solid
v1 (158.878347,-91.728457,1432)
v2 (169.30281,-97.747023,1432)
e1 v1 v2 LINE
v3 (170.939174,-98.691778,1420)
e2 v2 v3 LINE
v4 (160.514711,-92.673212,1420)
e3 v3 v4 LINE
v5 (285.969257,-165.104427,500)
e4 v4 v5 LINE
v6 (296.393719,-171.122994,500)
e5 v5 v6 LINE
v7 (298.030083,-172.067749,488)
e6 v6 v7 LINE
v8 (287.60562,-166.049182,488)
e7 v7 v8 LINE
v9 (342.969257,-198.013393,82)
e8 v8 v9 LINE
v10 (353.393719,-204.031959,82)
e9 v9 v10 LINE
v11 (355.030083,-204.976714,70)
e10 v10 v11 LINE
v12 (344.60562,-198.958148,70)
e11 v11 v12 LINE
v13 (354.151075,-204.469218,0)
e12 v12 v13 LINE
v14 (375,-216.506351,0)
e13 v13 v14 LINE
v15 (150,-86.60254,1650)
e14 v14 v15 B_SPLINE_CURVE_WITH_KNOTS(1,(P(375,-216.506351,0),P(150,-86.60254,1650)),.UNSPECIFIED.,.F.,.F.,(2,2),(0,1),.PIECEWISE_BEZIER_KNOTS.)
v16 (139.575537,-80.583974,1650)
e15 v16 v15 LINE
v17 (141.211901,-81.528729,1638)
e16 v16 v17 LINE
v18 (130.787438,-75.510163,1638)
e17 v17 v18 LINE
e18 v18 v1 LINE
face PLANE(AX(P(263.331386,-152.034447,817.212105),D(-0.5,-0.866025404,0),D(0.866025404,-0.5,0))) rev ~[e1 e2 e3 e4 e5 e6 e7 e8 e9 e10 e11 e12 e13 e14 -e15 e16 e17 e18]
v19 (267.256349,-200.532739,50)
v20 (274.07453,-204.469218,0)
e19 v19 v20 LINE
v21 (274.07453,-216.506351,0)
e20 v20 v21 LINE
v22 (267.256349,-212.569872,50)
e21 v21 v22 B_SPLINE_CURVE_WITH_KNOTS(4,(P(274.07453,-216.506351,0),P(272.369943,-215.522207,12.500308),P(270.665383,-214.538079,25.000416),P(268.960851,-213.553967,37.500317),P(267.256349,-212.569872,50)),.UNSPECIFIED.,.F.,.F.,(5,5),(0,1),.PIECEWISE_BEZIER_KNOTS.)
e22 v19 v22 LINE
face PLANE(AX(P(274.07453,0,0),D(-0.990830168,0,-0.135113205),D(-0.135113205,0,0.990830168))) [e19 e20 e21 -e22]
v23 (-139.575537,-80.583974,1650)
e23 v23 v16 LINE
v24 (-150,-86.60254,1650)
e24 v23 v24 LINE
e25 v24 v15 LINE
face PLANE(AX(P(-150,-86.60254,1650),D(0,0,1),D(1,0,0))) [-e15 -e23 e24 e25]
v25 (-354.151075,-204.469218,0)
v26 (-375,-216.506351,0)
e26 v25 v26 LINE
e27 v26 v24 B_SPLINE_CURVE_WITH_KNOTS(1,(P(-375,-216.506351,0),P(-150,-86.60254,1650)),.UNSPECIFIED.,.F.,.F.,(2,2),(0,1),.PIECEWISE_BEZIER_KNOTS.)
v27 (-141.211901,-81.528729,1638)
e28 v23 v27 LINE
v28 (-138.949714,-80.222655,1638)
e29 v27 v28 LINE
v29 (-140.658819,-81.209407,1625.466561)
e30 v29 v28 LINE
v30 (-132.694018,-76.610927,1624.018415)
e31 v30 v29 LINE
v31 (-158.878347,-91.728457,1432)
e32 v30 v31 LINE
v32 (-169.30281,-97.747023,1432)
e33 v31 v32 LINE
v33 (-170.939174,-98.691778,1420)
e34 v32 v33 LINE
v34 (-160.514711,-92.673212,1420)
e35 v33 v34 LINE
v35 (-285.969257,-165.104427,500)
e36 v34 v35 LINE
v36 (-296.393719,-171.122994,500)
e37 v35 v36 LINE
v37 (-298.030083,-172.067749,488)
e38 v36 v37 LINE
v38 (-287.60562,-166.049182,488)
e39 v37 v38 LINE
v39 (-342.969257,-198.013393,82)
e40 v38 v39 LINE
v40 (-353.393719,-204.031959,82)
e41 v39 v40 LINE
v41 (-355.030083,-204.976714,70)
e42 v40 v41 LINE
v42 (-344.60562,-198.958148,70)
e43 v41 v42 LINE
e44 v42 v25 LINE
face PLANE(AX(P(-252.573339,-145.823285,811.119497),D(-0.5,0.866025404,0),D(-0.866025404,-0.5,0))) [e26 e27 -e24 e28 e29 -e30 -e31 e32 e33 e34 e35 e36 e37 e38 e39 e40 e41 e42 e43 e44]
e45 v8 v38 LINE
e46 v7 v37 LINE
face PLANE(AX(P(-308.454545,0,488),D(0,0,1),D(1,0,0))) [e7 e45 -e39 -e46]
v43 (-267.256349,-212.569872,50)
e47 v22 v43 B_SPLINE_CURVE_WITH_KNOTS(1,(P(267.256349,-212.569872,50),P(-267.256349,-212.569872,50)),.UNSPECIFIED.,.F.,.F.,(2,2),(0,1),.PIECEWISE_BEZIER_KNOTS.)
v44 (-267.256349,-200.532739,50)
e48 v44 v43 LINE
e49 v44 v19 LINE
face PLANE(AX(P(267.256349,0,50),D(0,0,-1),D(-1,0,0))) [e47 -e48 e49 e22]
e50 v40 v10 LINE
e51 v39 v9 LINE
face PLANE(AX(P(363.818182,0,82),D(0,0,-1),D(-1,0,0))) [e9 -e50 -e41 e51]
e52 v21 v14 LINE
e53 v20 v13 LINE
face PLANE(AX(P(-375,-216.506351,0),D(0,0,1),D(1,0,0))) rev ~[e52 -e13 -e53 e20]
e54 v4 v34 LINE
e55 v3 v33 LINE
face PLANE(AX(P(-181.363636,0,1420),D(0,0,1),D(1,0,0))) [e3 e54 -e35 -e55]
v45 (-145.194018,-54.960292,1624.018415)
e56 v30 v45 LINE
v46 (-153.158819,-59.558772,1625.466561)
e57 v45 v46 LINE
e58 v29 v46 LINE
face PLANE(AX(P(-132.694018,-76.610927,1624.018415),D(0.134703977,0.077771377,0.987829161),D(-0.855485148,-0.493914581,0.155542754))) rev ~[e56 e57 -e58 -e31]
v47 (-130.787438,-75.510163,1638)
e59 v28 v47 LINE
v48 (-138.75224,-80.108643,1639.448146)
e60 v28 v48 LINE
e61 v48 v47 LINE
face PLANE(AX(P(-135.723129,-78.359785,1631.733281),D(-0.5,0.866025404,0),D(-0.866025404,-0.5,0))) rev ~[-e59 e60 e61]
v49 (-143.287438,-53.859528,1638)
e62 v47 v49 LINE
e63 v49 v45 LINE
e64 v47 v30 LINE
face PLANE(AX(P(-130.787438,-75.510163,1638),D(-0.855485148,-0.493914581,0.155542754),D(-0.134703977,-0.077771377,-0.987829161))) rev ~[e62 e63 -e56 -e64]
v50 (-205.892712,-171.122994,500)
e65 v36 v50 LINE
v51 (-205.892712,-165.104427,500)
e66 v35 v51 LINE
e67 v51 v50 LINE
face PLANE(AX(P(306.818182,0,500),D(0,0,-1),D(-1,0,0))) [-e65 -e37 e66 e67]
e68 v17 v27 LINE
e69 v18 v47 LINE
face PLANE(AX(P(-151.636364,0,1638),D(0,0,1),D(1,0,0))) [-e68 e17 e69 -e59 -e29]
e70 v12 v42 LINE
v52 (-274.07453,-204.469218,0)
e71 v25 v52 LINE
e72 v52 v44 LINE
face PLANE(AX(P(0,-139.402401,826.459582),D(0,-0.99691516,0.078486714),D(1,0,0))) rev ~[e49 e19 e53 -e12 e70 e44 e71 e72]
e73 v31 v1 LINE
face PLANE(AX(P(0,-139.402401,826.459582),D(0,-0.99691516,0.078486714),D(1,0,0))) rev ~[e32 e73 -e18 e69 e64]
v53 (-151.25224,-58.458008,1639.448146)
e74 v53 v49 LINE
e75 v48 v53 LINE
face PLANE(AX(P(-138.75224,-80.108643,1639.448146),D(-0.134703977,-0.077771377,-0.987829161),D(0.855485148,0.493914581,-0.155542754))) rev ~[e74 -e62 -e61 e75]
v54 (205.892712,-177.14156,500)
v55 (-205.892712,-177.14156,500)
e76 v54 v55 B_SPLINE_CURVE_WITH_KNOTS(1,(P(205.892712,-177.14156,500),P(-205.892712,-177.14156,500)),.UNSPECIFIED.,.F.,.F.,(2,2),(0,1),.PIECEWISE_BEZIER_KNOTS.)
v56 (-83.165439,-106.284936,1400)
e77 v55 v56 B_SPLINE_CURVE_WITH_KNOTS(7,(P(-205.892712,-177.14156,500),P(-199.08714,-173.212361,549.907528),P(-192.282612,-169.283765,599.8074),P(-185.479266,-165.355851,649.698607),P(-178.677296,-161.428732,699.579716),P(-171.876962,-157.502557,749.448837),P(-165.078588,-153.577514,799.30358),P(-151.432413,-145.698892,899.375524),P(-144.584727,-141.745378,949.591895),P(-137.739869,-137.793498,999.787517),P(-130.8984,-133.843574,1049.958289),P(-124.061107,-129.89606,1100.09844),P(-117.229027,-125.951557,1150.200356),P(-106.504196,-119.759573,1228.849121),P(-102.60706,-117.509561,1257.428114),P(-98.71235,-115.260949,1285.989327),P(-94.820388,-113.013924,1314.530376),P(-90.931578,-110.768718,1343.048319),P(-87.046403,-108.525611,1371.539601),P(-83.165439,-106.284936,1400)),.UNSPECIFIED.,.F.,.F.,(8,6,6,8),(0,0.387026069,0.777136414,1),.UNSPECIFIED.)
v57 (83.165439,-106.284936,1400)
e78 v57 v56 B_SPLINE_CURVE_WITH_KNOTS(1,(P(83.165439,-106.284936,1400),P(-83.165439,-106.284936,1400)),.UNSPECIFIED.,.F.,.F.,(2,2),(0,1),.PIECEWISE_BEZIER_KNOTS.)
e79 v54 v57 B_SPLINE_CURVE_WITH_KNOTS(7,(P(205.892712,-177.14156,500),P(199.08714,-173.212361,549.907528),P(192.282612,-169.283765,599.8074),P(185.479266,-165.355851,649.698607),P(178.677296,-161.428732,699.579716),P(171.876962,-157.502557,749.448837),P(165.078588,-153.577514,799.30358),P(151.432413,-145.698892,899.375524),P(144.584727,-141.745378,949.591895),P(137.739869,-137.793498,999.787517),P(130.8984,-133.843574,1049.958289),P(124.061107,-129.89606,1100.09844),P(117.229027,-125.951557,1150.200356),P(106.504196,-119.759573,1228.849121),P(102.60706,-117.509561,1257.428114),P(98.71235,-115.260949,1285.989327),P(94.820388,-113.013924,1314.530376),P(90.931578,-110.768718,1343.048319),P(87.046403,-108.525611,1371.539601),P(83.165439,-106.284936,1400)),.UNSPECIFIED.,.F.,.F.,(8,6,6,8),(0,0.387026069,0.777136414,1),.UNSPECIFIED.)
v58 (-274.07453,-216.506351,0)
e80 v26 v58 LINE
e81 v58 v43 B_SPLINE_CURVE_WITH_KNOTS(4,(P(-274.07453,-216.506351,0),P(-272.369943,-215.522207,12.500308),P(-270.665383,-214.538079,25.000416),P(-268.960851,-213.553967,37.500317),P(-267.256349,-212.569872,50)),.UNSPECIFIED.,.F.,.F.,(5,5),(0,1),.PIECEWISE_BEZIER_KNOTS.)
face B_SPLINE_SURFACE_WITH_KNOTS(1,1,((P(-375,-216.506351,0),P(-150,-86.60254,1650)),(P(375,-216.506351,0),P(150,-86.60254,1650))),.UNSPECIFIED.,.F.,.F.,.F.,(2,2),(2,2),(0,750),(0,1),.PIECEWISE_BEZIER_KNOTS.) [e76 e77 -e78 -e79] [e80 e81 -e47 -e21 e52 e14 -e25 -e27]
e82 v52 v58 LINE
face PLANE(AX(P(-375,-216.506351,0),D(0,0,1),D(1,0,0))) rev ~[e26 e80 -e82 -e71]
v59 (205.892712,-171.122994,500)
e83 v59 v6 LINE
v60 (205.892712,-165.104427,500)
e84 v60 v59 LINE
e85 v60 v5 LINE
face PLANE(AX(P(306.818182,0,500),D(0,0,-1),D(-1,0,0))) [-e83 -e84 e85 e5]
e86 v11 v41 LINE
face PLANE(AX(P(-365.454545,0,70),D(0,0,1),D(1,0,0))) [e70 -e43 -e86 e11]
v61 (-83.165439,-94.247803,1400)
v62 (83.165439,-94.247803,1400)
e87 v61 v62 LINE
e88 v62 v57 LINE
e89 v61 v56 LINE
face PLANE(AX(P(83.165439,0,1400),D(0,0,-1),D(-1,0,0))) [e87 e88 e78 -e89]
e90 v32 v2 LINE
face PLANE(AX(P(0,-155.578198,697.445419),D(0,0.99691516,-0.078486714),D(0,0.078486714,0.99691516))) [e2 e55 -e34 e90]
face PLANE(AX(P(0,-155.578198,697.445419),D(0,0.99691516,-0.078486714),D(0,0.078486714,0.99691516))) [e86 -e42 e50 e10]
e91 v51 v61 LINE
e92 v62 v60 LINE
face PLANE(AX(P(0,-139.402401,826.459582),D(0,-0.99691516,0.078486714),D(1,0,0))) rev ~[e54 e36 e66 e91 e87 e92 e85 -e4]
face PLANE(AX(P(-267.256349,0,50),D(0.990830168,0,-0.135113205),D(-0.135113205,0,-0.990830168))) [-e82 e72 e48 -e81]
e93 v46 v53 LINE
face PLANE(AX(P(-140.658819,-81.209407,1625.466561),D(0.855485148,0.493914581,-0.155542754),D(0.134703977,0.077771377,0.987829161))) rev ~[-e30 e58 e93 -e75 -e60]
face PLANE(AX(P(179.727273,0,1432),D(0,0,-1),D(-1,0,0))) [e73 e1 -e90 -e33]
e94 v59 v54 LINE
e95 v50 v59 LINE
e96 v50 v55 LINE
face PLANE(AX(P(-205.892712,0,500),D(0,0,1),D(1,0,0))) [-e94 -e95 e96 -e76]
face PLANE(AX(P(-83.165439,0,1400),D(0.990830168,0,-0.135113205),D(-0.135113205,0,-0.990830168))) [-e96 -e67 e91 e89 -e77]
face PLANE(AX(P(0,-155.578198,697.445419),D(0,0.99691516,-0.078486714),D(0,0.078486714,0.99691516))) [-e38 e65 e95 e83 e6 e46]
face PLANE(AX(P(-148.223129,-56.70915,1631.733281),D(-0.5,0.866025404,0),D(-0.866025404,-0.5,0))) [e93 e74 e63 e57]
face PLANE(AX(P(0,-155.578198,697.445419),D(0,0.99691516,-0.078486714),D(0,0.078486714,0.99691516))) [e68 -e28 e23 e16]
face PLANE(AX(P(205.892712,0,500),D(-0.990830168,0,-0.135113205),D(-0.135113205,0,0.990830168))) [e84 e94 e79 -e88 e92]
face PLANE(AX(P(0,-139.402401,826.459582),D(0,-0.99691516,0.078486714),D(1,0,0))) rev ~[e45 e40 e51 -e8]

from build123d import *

# Parameters (mm, degrees)
F7_R      = 960.2431856589
F8_DEPTH  = 635.5163904251
F12_R     = 870.2287794889
F13_DEPTH = 25
F14_R     = 892.9375722879
F15_DEPTH = 25
F19_REACH = 935.9843056137
F20_DEPTH = 216.5073510461
F23_DEPTH = 25


with BuildPart() as f5:
    # F3 (on Top) → F5 section 0
    with BuildSketch(Plane.XY):
        Polygon((-375, -216.5063509461), (375, -216.5063509461), (0, 433.0127018922), align=None)
    # F4 (on line) → F5 section 1
    with BuildSketch(Plane.XY.offset(1650)):
        Polygon((-150, -86.6025403784), (150, -86.6025403784), (0, 173.2050807569), align=None)
    loft()

    # F7 (on face) → F8 (cut, through all)
    with BuildSketch(Plane(origin=(0, -203.2096543416, 15.9986111776), x_dir=(1, 0, 0), z_dir=(0, -0.9969151597, 0.078486714))):
        with Locations((0, 812.9688501358)):
            Circle(F7_R)
    extrude(amount=-F8_DEPTH, mode=Mode.SUBTRACT)

    # F12 (on face) → F13 (cut)
    with BuildSketch(Plane(origin=(0, 0, 0), x_dir=(0.8660254038, -0.5, 0), z_dir=(-0.5, -0.8660254038, 0))):
        with Locations((304.0688931942, 817.2121047974)):
            Circle(F12_R)
    extrude(amount=-F13_DEPTH, mode=Mode.SUBTRACT)

    # F14 (on face) → F15 (cut)
    with BuildSketch(Plane(origin=(0, 0, 0), x_dir=(-0.8660254038, -0.5, 0), z_dir=(-0.5, 0.8660254038, 0))):
        with Locations((291.6465699673, 811.1194968224)):
            Circle(F14_R)
    extrude(amount=F15_DEPTH, mode=Mode.SUBTRACT)

    f19_end = Plane(origin=(0, -155.5781982198, 697.4454188962), x_dir=(0, 0.078486714, 0.9969151597), z_dir=(0, 0.9969151597, -0.078486714))
    # F17 (on Front) → F19 (cut, up to a plane its end follows)
    with BuildSketch(Plane.XZ):
        Polygon((-181.3636363636, 1420), (181.3636363636, 1420), (179.7272727273, 1432), (-179.7272727273, 1432), align=None)
        Polygon((151.6363636364, 1638), (150, 1650), (-150, 1650), (-151.6363636364, 1638), align=None)
        Polygon((308.4545454545, 488), (306.8181818182, 500), (-306.8181818182, 500), (-308.4545454545, 488), align=None)
        Polygon((-365.4545454545, 70), (365.4545454545, 70), (363.8181818182, 82), (-363.8181818182, 82), align=None)
    f19_long = extrude(amount=F19_REACH, mode=Mode.PRIVATE)
    add(split(f19_long, bisect_by=f19_end, keep=Keep.TOP, mode=Mode.PRIVATE), mode=Mode.SUBTRACT)

    # F16 (on Front) → F20 (cut, through all)
    with BuildSketch(Plane.XZ):
        Polygon((-267.2563485856, 50), (-274.0745304038, 0), (274.0745304038, 0), (267.2563485856, 50), align=None)
        Polygon((-205.8927122219, 500), (205.8927122219, 500), (83.1654394947, 1400), (-83.1654394947, 1400), align=None)
    extrude(amount=F20_DEPTH, mode=Mode.SUBTRACT)

    # F22 (on face) → F23 (join)
    with BuildSketch(Plane(origin=(0, 0, 0), x_dir=(-0.8660254038, -0.5, 0), z_dir=(-0.5, 0.8660254038, 0))):
        Polygon((160.2172859615, 1639.4481457139), (151.0203254662, 1638), (153.2218541075, 1624.0184153092), (162.4188146029, 1625.4665610231), align=None)
    extrude(amount=F23_DEPTH)


solid = f5.part
